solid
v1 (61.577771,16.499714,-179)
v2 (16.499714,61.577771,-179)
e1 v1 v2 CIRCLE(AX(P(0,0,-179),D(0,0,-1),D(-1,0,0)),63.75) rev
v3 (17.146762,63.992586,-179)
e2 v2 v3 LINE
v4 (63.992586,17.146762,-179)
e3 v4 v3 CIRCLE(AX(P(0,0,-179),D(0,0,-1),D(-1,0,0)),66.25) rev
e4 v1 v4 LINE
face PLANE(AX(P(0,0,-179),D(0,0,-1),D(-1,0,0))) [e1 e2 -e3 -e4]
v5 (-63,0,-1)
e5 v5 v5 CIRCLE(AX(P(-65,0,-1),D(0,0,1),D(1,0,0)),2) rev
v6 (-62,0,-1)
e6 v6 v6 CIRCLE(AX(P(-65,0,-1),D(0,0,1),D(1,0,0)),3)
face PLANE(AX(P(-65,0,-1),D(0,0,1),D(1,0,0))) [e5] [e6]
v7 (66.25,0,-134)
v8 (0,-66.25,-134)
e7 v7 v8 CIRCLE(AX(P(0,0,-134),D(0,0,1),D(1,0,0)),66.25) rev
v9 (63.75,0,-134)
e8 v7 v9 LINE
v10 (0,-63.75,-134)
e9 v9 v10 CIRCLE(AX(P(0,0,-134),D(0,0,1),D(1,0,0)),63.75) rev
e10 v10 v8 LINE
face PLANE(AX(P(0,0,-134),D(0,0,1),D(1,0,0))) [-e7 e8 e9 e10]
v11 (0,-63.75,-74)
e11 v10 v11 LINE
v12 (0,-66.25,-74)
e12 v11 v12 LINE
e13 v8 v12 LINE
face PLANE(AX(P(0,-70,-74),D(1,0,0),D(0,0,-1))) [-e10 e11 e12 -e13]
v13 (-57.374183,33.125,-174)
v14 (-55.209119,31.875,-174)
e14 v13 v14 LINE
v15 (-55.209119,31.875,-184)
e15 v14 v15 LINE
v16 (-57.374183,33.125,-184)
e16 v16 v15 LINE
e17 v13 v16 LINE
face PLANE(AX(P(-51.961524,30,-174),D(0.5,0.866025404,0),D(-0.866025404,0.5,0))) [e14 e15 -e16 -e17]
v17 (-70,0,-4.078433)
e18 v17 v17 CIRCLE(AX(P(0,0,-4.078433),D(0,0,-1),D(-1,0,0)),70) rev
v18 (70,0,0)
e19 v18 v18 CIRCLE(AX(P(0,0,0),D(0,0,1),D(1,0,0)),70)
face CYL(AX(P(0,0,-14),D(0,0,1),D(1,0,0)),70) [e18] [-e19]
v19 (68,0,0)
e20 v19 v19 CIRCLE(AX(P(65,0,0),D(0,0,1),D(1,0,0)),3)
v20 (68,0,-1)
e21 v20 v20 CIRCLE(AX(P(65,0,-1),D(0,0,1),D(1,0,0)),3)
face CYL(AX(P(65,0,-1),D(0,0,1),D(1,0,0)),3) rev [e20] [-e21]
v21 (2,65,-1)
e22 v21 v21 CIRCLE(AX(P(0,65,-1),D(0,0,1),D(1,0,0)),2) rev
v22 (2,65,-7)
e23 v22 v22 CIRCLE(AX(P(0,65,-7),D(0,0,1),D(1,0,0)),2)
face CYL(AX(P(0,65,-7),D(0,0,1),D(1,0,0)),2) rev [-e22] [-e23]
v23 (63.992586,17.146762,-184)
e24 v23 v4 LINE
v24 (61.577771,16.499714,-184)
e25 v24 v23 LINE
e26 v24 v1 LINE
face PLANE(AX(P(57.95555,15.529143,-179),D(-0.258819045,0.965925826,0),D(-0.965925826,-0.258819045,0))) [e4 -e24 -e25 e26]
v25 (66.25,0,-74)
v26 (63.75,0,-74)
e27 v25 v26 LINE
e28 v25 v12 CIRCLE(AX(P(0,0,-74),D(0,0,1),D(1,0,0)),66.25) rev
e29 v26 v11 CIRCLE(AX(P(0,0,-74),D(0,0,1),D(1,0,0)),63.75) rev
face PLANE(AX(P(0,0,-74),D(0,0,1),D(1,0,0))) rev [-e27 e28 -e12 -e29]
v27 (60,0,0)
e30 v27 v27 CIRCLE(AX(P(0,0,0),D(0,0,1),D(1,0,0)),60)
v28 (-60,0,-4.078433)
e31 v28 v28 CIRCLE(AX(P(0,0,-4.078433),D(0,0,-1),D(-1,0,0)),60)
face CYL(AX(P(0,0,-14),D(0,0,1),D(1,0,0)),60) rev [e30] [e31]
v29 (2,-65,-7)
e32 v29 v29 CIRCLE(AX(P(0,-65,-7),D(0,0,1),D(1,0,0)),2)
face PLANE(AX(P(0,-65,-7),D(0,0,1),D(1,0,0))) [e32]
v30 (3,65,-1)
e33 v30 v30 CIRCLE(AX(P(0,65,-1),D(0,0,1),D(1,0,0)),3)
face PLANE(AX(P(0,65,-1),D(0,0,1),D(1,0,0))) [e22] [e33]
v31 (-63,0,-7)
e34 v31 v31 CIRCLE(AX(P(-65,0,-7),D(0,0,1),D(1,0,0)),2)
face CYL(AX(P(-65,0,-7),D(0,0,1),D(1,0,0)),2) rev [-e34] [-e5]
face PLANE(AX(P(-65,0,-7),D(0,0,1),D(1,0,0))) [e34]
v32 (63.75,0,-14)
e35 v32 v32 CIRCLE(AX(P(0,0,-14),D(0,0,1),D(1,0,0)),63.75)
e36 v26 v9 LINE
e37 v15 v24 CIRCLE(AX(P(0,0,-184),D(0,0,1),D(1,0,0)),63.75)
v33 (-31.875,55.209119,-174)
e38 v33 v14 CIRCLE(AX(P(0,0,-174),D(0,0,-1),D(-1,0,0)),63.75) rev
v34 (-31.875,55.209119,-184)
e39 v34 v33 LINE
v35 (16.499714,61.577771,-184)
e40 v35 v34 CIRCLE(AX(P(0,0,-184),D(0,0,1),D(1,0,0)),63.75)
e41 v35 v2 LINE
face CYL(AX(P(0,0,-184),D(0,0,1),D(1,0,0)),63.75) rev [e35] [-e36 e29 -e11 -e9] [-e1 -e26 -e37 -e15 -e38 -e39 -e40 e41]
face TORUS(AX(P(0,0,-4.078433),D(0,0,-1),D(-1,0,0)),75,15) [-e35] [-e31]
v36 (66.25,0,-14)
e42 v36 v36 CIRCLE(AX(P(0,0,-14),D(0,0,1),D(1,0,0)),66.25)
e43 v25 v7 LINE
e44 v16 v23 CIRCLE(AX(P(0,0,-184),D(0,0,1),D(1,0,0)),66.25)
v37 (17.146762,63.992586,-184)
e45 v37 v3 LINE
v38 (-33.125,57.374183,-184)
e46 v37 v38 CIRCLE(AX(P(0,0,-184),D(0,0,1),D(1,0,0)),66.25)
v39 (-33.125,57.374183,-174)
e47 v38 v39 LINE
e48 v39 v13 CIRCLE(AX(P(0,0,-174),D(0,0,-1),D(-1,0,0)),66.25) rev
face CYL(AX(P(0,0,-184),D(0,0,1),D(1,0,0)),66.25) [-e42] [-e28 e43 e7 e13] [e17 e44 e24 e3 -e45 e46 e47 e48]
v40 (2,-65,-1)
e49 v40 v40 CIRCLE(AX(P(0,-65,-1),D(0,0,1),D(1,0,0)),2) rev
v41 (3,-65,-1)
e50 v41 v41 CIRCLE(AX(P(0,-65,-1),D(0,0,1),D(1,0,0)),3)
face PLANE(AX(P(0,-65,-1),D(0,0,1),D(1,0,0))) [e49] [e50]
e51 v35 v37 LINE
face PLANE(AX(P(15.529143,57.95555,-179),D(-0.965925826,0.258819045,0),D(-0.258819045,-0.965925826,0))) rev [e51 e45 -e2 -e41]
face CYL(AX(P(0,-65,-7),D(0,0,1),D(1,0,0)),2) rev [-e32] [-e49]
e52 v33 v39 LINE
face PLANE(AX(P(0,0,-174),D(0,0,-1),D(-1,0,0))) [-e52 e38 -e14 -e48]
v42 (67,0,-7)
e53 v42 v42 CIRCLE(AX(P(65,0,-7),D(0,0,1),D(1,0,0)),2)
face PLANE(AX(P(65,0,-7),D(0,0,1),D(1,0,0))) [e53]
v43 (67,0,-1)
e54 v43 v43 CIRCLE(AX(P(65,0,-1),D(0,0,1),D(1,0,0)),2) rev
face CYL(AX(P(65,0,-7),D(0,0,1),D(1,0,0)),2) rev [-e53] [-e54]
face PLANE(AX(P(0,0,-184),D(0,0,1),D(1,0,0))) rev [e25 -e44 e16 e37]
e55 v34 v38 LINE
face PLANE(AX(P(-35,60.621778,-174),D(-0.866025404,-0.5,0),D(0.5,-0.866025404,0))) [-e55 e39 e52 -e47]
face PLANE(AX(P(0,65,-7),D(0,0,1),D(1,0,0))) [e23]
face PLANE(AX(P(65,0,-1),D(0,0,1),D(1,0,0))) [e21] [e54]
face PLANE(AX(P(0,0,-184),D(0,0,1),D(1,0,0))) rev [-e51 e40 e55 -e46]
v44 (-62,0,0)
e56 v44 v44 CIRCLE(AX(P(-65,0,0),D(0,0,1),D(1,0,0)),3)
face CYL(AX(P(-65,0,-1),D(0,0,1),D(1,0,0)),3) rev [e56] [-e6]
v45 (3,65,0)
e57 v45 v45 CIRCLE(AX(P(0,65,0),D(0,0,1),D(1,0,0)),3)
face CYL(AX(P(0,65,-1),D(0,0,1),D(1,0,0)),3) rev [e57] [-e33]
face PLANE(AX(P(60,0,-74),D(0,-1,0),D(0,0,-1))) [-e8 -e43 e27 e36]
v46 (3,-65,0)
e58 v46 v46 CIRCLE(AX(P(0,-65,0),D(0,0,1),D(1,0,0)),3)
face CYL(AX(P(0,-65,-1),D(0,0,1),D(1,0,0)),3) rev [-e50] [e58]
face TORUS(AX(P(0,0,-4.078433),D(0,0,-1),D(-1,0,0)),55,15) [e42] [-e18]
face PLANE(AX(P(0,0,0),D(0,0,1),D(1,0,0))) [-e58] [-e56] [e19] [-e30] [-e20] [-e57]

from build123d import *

# Parameters (mm, degrees)
SKIZZE1_R                       = 70
SKIZZE1_R_2                     = 60
AUFSATZ_LINEAR_AUSTRAGEN1_DEPTH = 14
AUFSATZ_LINEAR_START            = -14
SKIZZE10_R                      = 66.25
SKIZZE10_R_2                    = 63.75
AUFSATZ_LINEAR_AUSTRAGEN2_DEPTH = 170
SCHNITT_LINEAR_START            = -74
SCHNITT_LINEAR_AUSTRAGEN1_DEPTH = 60
SCHNITT_LINEAR_START_2          = -174
SCHNITT_LINEAR_AUSTRAGEN3_DEPTH = 10
SCHNITT_LINEAR_START_3          = -179
SCHNITT_LINEAR_AUSTRAGEN4_DEPTH = 5
SKIZZE3_R                       = 2
SCHNITT_LINEAR_AUSTRAGEN5_DEPTH = 7
SKIZZE9_R                       = 3
SCHNITT_LINEAR_AUSTRAGEN6_DEPTH = 1
VERRUNDUNG4_R                   = 15
VERRUNDUNG5_R                   = 15


with BuildPart() as part:
    # Skizze1 → Aufsatz-Linear austragen1 (new body)
    with BuildSketch(Plane(origin=(0, 0, 0), x_dir=(0, 1, 0), z_dir=(0, 0, 1))):
        with Locations(Location((0, 0, 0), (0, 0, 270))):
            Circle(SKIZZE1_R)
        with Locations(Location((0, 0, 0), (0, 0, 270))):
            Circle(SKIZZE1_R_2, mode=Mode.SUBTRACT)
    extrude(amount=-AUFSATZ_LINEAR_AUSTRAGEN1_DEPTH)

    # Skizze10 → Aufsatz-Linear austragen2 (add)
    with BuildSketch(Plane.XY.offset(AUFSATZ_LINEAR_START)):
        Circle(SKIZZE10_R)
        Circle(SKIZZE10_R_2, mode=Mode.SUBTRACT)
    extrude(amount=-AUFSATZ_LINEAR_AUSTRAGEN2_DEPTH)

    # Skizze4 → Schnitt-Linear austragen1 (cut)
    with BuildSketch(Plane(origin=(0, 0, 0), x_dir=(0, 1, 0), z_dir=(0, 0, 1)).offset(SCHNITT_LINEAR_START)):
        with BuildLine():
            Line((-70, 0), (-60, 0))
            ThreePointArc((-60, 0), (-42.426406871, -42.426406871), (0, -60))
            Line((0, -60), (0, -70))
            ThreePointArc((0, -70), (-49.497474683, -49.497474683), (-70, 0))
        make_face()
    extrude(amount=-SCHNITT_LINEAR_AUSTRAGEN1_DEPTH, mode=Mode.SUBTRACT)

    # Skizze5 → Schnitt-Linear austragen3 (cut)
    with BuildSketch(Plane(origin=(0, 0, 0), x_dir=(0, 1, 0), z_dir=(0, 0, 1)).offset(SCHNITT_LINEAR_START_2)):
        with BuildLine():
            Line((30, 51.961524227), (35, 60.621778265))
            ThreePointArc((35, 60.621778265), (49.497474683, 49.497474683), (60.621778265, 35))
            Line((60.621778265, 35), (51.961524227, 30))
            ThreePointArc((51.961524227, 30), (42.426406871, 42.426406871), (30, 51.961524227))
        make_face()
    extrude(amount=-SCHNITT_LINEAR_AUSTRAGEN3_DEPTH, mode=Mode.SUBTRACT)

    # Skizze6 → Schnitt-Linear austragen4 (cut)
    with BuildSketch(Plane(origin=(0, 0, 0), x_dir=(0, 1, 0), z_dir=(0, 0, 1)).offset(SCHNITT_LINEAR_START_3)):
        with BuildLine():
            Line((57.955549577, -15.529142706), (67.61480784, -18.117333157))
            ThreePointArc((67.61480784, -18.117333157), (49.497474683, -49.497474683), (18.117333157, -67.61480784))
            Line((18.117333157, -67.61480784), (15.529142706, -57.955549577))
            ThreePointArc((15.529142706, -57.955549577), (42.426406871, -42.426406871), (57.955549577, -15.529142706))
        make_face()
    extrude(amount=-SCHNITT_LINEAR_AUSTRAGEN4_DEPTH, mode=Mode.SUBTRACT)

    # Skizze3 → Schnitt-Linear austragen5 (cut)
    with BuildSketch(Plane(origin=(0, 0, 0), x_dir=(0, 1, 0), z_dir=(0, 0, 1))):
        with Locations(Location((-65, 0, 0), (0, 0, 270))):
            Circle(SKIZZE3_R)
        with Locations(Location((0, 65, 0), (0, 0, 270))):
            Circle(SKIZZE3_R)
        with Locations(Location((65, 0, 0), (0, 0, 270))):
            Circle(SKIZZE3_R)
        with Locations(Location((0, -65, 0), (0, 0, 270))):
            Circle(SKIZZE3_R)
    extrude(amount=-SCHNITT_LINEAR_AUSTRAGEN5_DEPTH, mode=Mode.SUBTRACT)

    # Skizze9 → Schnitt-Linear austragen6 (cut)
    with BuildSketch(Plane(origin=(0, 0, 0), x_dir=(0, 1, 0), z_dir=(0, 0, 1))):
        with Locations(Location((0, 65, 0), (0, 0, 270))):
            Circle(SKIZZE9_R)
        with Locations(Location((65, 0, 0), (0, 0, 270))):
            Circle(SKIZZE9_R)
        with Locations(Location((0, -65, 0), (0, 0, 270))):
            Circle(SKIZZE9_R)
        with Locations(Location((-65, 0, 0), (0, 0, 270))):
            Circle(SKIZZE9_R)
    extrude(amount=-SCHNITT_LINEAR_AUSTRAGEN6_DEPTH, mode=Mode.SUBTRACT)

    # Verrundung4
    # the kernel refuses this fillet: 15 mm, written as the material it takes off along each edge
    with BuildSketch(Plane(origin=(0, 0, -14), x_dir=(1, 0, 0), z_dir=(0, -1, 0))) as verrundung4_piece_1:
        with BuildLine():
            CenterArc((75, 9.921567416), VERRUNDUNG4_R, 180, 41.409622109)
            Line((63.75, 0), (60, 0))
            Line((60, 0), (60, 9.921567416))
        make_face()
    revolve(axis=Axis((0, 0, -14), (0, 0, 1)), mode=Mode.SUBTRACT)

    # Verrundung5
    # the kernel refuses this fillet: 15 mm, written as the material it takes off along each edge
    with BuildSketch(Plane(origin=(0, 0, -14), x_dir=(1, 0, 0), z_dir=(0, -1, 0))) as verrundung5_piece_1:
        with BuildLine():
            CenterArc((55, 9.921567416), VERRUNDUNG5_R, 318.590377891, 41.409622109)
            Line((66.25, 0), (70, 0))
            Line((70, 0), (70, 9.921567416))
        make_face()
    revolve(axis=Axis((0, 0, -14), (0, 0, 1)), mode=Mode.SUBTRACT)


solid = part.part
